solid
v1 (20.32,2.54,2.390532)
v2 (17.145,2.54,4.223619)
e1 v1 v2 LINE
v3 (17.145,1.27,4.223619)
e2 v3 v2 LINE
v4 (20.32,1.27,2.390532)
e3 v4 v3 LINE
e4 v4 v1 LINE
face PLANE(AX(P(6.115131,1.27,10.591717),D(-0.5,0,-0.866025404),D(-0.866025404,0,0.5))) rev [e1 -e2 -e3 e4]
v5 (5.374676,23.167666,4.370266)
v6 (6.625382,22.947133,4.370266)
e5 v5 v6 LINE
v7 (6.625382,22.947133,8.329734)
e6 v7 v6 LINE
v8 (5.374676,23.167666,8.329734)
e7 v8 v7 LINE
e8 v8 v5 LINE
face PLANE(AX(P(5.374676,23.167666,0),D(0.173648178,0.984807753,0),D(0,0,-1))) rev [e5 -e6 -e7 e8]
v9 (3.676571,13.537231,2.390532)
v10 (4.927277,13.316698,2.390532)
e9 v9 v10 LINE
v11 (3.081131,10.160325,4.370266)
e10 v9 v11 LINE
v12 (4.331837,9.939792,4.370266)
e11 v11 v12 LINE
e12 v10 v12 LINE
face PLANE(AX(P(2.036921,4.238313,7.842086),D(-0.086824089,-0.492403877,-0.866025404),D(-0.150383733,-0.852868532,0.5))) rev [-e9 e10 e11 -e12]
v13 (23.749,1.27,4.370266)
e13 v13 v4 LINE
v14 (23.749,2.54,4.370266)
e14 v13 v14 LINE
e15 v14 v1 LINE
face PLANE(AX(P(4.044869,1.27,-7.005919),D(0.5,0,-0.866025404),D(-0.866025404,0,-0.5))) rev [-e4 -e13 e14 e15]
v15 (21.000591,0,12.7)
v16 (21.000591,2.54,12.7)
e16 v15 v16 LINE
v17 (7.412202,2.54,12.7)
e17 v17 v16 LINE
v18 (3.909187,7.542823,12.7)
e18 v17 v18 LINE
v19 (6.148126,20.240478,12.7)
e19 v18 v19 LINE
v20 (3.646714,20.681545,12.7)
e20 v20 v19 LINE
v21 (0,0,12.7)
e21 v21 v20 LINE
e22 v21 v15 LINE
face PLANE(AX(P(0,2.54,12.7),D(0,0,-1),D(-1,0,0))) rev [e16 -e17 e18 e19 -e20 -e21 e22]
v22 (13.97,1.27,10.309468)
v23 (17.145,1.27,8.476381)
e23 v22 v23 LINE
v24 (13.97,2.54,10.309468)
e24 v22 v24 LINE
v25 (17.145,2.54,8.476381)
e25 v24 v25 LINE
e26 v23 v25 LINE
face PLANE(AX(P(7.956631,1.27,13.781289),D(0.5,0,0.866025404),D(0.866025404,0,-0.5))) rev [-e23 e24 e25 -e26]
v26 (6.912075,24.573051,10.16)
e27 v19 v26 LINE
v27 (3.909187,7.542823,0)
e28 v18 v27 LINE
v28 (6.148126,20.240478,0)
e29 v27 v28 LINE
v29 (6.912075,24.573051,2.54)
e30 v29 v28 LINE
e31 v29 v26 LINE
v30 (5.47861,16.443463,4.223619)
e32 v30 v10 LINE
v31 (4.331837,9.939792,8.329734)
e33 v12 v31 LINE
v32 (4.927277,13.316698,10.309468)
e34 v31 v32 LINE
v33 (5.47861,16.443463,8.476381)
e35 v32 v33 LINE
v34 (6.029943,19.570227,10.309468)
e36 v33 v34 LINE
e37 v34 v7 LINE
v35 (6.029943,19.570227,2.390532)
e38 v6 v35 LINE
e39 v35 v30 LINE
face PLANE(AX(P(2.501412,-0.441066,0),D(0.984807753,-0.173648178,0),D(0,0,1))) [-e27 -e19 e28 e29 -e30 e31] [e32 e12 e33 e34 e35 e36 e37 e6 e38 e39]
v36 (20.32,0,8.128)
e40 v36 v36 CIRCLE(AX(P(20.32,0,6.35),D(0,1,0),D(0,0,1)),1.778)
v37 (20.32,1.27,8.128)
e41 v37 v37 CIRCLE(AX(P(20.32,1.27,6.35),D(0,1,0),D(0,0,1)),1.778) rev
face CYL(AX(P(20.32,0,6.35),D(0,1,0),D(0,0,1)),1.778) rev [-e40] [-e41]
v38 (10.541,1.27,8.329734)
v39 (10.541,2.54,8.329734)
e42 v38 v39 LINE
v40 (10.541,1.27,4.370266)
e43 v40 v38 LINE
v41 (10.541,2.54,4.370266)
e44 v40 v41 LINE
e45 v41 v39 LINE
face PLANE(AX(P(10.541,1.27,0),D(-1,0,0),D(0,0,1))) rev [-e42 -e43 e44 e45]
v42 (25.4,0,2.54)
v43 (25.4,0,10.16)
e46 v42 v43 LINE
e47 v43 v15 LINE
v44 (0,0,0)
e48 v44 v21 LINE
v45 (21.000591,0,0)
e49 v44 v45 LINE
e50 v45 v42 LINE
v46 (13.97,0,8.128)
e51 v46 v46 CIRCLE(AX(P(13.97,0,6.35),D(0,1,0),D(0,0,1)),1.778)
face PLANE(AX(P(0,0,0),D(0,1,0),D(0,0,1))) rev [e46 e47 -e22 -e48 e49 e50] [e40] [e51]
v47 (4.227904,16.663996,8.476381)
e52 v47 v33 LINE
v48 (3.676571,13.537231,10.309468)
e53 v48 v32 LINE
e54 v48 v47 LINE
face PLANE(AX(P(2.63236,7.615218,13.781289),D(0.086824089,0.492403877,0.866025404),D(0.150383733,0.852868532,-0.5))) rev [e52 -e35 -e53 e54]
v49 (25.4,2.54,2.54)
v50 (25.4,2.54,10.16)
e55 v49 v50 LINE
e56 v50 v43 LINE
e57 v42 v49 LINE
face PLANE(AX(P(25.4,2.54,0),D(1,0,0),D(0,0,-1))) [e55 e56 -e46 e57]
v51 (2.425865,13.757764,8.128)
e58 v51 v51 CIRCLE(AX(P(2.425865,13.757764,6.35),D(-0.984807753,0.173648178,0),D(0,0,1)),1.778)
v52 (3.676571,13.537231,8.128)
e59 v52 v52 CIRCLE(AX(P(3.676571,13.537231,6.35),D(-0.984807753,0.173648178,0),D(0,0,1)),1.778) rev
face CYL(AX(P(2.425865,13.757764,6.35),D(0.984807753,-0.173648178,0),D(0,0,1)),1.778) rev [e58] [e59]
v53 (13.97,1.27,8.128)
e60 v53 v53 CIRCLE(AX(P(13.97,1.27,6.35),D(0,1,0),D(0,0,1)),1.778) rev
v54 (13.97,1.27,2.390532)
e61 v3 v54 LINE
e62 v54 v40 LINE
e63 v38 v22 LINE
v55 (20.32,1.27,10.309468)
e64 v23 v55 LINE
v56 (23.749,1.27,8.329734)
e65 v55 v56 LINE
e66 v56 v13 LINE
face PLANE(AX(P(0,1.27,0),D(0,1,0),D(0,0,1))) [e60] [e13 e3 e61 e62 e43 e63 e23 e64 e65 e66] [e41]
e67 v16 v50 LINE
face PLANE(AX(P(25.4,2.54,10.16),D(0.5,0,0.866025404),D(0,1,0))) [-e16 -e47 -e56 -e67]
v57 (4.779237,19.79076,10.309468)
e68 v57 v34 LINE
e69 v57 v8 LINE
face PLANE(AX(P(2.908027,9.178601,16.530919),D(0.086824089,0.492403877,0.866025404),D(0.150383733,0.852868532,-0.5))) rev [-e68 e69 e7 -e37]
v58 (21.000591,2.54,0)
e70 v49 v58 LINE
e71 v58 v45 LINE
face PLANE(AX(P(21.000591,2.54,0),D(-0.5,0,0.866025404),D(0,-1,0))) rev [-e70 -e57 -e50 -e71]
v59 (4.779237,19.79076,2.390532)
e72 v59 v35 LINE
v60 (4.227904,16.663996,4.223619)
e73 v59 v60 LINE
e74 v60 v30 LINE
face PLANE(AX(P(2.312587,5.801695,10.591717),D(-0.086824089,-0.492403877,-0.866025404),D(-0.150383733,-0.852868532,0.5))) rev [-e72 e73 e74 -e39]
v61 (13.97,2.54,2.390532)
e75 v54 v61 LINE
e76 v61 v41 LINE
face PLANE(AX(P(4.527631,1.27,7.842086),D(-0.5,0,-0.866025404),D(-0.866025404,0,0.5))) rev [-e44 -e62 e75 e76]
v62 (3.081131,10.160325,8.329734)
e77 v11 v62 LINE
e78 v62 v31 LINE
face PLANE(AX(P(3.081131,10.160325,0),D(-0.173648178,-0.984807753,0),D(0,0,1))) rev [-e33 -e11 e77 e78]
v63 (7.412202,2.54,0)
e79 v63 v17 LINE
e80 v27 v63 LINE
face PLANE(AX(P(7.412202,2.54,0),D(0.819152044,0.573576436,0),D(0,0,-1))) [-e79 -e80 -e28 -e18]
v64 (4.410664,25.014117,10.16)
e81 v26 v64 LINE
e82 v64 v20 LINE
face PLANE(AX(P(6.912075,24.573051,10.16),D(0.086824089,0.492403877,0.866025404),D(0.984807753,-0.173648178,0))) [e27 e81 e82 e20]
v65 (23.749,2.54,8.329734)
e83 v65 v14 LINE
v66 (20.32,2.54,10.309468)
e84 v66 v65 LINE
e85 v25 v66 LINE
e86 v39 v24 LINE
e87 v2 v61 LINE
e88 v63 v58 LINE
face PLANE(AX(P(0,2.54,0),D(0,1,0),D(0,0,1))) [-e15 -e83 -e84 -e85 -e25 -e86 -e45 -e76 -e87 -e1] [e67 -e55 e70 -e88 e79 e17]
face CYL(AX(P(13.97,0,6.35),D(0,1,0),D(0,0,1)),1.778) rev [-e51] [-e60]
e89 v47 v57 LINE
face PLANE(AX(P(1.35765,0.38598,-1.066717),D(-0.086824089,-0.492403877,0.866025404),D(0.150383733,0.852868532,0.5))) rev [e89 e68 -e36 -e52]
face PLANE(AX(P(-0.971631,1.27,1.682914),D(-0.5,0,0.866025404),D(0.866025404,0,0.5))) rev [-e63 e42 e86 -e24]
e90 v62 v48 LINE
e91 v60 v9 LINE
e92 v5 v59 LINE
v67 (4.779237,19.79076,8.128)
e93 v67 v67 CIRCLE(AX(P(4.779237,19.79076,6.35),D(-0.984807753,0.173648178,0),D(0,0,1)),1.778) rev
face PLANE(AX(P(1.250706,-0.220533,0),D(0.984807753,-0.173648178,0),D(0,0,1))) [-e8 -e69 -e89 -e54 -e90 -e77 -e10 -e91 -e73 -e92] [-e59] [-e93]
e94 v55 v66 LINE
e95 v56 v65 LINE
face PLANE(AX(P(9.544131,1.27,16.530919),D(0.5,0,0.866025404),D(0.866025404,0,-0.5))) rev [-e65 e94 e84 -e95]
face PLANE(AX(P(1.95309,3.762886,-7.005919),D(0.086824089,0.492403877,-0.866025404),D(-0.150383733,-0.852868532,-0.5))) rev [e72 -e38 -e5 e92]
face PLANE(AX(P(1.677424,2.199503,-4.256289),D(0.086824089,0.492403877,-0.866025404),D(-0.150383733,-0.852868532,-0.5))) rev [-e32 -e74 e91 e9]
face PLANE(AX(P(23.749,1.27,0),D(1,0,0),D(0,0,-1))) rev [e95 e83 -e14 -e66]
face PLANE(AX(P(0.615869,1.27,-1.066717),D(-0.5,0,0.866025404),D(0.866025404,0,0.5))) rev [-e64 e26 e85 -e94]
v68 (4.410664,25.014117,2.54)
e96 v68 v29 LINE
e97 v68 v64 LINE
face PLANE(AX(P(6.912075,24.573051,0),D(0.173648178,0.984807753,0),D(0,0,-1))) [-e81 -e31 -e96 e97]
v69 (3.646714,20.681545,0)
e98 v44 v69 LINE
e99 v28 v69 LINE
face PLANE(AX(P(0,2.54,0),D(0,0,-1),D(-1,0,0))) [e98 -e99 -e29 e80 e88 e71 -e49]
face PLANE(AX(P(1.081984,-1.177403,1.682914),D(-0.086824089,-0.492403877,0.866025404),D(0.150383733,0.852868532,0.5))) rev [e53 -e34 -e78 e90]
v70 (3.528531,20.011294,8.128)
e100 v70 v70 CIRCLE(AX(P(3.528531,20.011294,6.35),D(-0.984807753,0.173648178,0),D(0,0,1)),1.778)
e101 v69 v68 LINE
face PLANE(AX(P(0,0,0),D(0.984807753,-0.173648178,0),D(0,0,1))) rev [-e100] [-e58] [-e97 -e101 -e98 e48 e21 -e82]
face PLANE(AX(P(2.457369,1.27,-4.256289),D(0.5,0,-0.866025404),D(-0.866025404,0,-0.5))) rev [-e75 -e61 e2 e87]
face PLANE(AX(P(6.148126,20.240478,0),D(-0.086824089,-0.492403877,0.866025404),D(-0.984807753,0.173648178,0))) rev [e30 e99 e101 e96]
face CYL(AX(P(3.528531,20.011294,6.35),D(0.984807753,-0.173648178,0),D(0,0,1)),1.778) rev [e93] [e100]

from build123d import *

# Parameters (mm, degrees)
SKETCH1_W           = 25.4
SKETCH1_H           = 12.7
BOSS_EXTRUDE1_DEPTH = 2.54
CUT_EXTRUDE1_DEPTH  = 29.511429287
CHAMFER1_SIZE2      = 3.027054125
CHAMFER1_SIZE       = 2.54
SKETCH4_R           = 1.778
CUT_EXTRUDE2_DEPTH  = 1.27
CHAMFER3_SIZE       = 2.54
CHAMFER3_SIZE2      = 4.399409051
CHAMFER2_SIZE       = 5.08
CHAMFER2_SIZE2      = 4.385147389


with BuildPart() as part:
    # Sketch1 → Boss-Extrude1 (new body)
    with BuildSketch(Plane(origin=(0, 0, 0), x_dir=(1, 0, 0), z_dir=(0, 1, 0))):
        with Locations((12.7, -6.35)):
            Rectangle(SKETCH1_W, SKETCH1_H)
    extrude(amount=BOSS_EXTRUDE1_DEPTH)

    # Sketch2 → Cut-Extrude1 (cut, through all)
    with BuildSketch(Plane(origin=(0, 2.54, 0), x_dir=(1, 0, 0), z_dir=(0, 1, 0))):
        with BuildLine():
            ThreePointArc((22.098, -6.35), (20.32, -4.572), (18.542, -6.35))
            Line((18.542, -6.35), (22.098, -6.35))
        make_face()
        with BuildLine():
            Line((22.098, -6.35), (18.542, -6.35))
            ThreePointArc((18.542, -6.35), (20.32, -8.128), (22.098, -6.35))
        make_face()
        with BuildLine():
            ThreePointArc((15.748, -6.35), (13.97, -4.572), (12.192, -6.35))
            Line((12.192, -6.35), (15.748, -6.35))
        make_face()
        with BuildLine():
            Line((15.748, -6.35), (12.192, -6.35))
            ThreePointArc((12.192, -6.35), (13.97, -8.128), (15.748, -6.35))
        make_face()
    extrude(amount=-CUT_EXTRUDE1_DEPTH, mode=Mode.SUBTRACT)

    # Chamfer1
    chamfer1_edges = [part.edges().sort_by_distance(p)[0] for p in [
        (0, 2.54, 6.35),
    ]]
    chamfer1_side = [part.faces().sort_by_distance(p)[0] for p in [
        (0, 2.4892, 6.35),
    ]]
    chamfer(chamfer1_edges, length=CHAMFER1_SIZE - 0.0001, length2=CHAMFER1_SIZE2 - 0.0001, reference=chamfer1_side[0])  # a hair under: the kernel refuses the full size

    # Sketch4 → Cut-Extrude2 (cut)
    # profile 1 of 3: a face of its own
    with BuildSketch(Plane(origin=(0, 2.54, 0), x_dir=(1, 0, 0), z_dir=(0, 1, 0))):
        Polygon((17.145, -4.223618959), (13.97, -2.390531854), (10.541, -4.370265927), (10.541, -8.329734073), (13.97, -10.309468146), (17.145, -8.476381041), (16.891, -8.329734073), (16.891, -4.370265927), align=None)
        with Locations(Location((13.97, -6.35, 0), (0, 0, 270))):
            Circle(SKETCH4_R, mode=Mode.SUBTRACT)
    # profile 2 of 3: a face of its own
    with BuildSketch(Plane(origin=(0, 2.54, 0), x_dir=(1, 0, 0), z_dir=(0, 1, 0))):
        Polygon((20.32, -2.390531854), (17.145, -4.223618959), (17.399, -4.370265927), (17.399, -8.329734073), (17.145, -8.476381041), (20.32, -10.309468146), (23.749, -8.329734073), (23.749, -4.370265927), align=None)
        with Locations(Location((20.32, -6.35, 0), (0, 0, 270))):
            Circle(SKETCH4_R, mode=Mode.SUBTRACT)
    # profile 3 of 3: a face of its own
    with BuildSketch(Plane(origin=(0, 2.54, 0), x_dir=(1, 0, 0), z_dir=(0, 1, 0))):
        Polygon((17.399, -4.370265927), (17.145, -4.223618959), (16.891, -4.370265927), (16.891, -8.329734073), (17.145, -8.476381041), (17.399, -8.329734073), align=None)
    extrude(amount=-CUT_EXTRUDE2_DEPTH, mode=Mode.SUBTRACT)

    # Chamfer3
    chamfer3_edges = [part.edges().sort_by_distance(p)[0] for p in [
        (25.4, 1.27, 0),
        (25.4, 1.27, 12.7),
    ]]
    chamfer3_side = [part.faces().sort_by_distance(p)[0] for p in [
        (25.4, 1.27, 6.35),
    ]]
    chamfer(chamfer3_edges, length=CHAMFER3_SIZE, length2=CHAMFER3_SIZE2, reference=chamfer3_side[0])

    # Mirror1: part across plane


with BuildPart() as part_1:
    add(part.part)
    add(part.part.mirror(Plane(origin=(3.027054125, 2.54, 0), x_dir=(0, 0, 1), z_dir=(-0.6427876096865399, 0.7660444431189777, 0))))

    # Chamfer2
    chamfer2_edges = [part_1.edges().sort_by_distance(p)[0] for p in [
        (3.026954125, 2.54, 6.35),
    ]]
    chamfer2_side = [part_1.faces().sort_by_distance(p)[0] for p in [
        (4.587581401, 11.390189966, 0.257263255),
    ]]
    chamfer(chamfer2_edges, length=CHAMFER2_SIZE, length2=CHAMFER2_SIZE2, reference=chamfer2_side[0])


solid = part_1.part
